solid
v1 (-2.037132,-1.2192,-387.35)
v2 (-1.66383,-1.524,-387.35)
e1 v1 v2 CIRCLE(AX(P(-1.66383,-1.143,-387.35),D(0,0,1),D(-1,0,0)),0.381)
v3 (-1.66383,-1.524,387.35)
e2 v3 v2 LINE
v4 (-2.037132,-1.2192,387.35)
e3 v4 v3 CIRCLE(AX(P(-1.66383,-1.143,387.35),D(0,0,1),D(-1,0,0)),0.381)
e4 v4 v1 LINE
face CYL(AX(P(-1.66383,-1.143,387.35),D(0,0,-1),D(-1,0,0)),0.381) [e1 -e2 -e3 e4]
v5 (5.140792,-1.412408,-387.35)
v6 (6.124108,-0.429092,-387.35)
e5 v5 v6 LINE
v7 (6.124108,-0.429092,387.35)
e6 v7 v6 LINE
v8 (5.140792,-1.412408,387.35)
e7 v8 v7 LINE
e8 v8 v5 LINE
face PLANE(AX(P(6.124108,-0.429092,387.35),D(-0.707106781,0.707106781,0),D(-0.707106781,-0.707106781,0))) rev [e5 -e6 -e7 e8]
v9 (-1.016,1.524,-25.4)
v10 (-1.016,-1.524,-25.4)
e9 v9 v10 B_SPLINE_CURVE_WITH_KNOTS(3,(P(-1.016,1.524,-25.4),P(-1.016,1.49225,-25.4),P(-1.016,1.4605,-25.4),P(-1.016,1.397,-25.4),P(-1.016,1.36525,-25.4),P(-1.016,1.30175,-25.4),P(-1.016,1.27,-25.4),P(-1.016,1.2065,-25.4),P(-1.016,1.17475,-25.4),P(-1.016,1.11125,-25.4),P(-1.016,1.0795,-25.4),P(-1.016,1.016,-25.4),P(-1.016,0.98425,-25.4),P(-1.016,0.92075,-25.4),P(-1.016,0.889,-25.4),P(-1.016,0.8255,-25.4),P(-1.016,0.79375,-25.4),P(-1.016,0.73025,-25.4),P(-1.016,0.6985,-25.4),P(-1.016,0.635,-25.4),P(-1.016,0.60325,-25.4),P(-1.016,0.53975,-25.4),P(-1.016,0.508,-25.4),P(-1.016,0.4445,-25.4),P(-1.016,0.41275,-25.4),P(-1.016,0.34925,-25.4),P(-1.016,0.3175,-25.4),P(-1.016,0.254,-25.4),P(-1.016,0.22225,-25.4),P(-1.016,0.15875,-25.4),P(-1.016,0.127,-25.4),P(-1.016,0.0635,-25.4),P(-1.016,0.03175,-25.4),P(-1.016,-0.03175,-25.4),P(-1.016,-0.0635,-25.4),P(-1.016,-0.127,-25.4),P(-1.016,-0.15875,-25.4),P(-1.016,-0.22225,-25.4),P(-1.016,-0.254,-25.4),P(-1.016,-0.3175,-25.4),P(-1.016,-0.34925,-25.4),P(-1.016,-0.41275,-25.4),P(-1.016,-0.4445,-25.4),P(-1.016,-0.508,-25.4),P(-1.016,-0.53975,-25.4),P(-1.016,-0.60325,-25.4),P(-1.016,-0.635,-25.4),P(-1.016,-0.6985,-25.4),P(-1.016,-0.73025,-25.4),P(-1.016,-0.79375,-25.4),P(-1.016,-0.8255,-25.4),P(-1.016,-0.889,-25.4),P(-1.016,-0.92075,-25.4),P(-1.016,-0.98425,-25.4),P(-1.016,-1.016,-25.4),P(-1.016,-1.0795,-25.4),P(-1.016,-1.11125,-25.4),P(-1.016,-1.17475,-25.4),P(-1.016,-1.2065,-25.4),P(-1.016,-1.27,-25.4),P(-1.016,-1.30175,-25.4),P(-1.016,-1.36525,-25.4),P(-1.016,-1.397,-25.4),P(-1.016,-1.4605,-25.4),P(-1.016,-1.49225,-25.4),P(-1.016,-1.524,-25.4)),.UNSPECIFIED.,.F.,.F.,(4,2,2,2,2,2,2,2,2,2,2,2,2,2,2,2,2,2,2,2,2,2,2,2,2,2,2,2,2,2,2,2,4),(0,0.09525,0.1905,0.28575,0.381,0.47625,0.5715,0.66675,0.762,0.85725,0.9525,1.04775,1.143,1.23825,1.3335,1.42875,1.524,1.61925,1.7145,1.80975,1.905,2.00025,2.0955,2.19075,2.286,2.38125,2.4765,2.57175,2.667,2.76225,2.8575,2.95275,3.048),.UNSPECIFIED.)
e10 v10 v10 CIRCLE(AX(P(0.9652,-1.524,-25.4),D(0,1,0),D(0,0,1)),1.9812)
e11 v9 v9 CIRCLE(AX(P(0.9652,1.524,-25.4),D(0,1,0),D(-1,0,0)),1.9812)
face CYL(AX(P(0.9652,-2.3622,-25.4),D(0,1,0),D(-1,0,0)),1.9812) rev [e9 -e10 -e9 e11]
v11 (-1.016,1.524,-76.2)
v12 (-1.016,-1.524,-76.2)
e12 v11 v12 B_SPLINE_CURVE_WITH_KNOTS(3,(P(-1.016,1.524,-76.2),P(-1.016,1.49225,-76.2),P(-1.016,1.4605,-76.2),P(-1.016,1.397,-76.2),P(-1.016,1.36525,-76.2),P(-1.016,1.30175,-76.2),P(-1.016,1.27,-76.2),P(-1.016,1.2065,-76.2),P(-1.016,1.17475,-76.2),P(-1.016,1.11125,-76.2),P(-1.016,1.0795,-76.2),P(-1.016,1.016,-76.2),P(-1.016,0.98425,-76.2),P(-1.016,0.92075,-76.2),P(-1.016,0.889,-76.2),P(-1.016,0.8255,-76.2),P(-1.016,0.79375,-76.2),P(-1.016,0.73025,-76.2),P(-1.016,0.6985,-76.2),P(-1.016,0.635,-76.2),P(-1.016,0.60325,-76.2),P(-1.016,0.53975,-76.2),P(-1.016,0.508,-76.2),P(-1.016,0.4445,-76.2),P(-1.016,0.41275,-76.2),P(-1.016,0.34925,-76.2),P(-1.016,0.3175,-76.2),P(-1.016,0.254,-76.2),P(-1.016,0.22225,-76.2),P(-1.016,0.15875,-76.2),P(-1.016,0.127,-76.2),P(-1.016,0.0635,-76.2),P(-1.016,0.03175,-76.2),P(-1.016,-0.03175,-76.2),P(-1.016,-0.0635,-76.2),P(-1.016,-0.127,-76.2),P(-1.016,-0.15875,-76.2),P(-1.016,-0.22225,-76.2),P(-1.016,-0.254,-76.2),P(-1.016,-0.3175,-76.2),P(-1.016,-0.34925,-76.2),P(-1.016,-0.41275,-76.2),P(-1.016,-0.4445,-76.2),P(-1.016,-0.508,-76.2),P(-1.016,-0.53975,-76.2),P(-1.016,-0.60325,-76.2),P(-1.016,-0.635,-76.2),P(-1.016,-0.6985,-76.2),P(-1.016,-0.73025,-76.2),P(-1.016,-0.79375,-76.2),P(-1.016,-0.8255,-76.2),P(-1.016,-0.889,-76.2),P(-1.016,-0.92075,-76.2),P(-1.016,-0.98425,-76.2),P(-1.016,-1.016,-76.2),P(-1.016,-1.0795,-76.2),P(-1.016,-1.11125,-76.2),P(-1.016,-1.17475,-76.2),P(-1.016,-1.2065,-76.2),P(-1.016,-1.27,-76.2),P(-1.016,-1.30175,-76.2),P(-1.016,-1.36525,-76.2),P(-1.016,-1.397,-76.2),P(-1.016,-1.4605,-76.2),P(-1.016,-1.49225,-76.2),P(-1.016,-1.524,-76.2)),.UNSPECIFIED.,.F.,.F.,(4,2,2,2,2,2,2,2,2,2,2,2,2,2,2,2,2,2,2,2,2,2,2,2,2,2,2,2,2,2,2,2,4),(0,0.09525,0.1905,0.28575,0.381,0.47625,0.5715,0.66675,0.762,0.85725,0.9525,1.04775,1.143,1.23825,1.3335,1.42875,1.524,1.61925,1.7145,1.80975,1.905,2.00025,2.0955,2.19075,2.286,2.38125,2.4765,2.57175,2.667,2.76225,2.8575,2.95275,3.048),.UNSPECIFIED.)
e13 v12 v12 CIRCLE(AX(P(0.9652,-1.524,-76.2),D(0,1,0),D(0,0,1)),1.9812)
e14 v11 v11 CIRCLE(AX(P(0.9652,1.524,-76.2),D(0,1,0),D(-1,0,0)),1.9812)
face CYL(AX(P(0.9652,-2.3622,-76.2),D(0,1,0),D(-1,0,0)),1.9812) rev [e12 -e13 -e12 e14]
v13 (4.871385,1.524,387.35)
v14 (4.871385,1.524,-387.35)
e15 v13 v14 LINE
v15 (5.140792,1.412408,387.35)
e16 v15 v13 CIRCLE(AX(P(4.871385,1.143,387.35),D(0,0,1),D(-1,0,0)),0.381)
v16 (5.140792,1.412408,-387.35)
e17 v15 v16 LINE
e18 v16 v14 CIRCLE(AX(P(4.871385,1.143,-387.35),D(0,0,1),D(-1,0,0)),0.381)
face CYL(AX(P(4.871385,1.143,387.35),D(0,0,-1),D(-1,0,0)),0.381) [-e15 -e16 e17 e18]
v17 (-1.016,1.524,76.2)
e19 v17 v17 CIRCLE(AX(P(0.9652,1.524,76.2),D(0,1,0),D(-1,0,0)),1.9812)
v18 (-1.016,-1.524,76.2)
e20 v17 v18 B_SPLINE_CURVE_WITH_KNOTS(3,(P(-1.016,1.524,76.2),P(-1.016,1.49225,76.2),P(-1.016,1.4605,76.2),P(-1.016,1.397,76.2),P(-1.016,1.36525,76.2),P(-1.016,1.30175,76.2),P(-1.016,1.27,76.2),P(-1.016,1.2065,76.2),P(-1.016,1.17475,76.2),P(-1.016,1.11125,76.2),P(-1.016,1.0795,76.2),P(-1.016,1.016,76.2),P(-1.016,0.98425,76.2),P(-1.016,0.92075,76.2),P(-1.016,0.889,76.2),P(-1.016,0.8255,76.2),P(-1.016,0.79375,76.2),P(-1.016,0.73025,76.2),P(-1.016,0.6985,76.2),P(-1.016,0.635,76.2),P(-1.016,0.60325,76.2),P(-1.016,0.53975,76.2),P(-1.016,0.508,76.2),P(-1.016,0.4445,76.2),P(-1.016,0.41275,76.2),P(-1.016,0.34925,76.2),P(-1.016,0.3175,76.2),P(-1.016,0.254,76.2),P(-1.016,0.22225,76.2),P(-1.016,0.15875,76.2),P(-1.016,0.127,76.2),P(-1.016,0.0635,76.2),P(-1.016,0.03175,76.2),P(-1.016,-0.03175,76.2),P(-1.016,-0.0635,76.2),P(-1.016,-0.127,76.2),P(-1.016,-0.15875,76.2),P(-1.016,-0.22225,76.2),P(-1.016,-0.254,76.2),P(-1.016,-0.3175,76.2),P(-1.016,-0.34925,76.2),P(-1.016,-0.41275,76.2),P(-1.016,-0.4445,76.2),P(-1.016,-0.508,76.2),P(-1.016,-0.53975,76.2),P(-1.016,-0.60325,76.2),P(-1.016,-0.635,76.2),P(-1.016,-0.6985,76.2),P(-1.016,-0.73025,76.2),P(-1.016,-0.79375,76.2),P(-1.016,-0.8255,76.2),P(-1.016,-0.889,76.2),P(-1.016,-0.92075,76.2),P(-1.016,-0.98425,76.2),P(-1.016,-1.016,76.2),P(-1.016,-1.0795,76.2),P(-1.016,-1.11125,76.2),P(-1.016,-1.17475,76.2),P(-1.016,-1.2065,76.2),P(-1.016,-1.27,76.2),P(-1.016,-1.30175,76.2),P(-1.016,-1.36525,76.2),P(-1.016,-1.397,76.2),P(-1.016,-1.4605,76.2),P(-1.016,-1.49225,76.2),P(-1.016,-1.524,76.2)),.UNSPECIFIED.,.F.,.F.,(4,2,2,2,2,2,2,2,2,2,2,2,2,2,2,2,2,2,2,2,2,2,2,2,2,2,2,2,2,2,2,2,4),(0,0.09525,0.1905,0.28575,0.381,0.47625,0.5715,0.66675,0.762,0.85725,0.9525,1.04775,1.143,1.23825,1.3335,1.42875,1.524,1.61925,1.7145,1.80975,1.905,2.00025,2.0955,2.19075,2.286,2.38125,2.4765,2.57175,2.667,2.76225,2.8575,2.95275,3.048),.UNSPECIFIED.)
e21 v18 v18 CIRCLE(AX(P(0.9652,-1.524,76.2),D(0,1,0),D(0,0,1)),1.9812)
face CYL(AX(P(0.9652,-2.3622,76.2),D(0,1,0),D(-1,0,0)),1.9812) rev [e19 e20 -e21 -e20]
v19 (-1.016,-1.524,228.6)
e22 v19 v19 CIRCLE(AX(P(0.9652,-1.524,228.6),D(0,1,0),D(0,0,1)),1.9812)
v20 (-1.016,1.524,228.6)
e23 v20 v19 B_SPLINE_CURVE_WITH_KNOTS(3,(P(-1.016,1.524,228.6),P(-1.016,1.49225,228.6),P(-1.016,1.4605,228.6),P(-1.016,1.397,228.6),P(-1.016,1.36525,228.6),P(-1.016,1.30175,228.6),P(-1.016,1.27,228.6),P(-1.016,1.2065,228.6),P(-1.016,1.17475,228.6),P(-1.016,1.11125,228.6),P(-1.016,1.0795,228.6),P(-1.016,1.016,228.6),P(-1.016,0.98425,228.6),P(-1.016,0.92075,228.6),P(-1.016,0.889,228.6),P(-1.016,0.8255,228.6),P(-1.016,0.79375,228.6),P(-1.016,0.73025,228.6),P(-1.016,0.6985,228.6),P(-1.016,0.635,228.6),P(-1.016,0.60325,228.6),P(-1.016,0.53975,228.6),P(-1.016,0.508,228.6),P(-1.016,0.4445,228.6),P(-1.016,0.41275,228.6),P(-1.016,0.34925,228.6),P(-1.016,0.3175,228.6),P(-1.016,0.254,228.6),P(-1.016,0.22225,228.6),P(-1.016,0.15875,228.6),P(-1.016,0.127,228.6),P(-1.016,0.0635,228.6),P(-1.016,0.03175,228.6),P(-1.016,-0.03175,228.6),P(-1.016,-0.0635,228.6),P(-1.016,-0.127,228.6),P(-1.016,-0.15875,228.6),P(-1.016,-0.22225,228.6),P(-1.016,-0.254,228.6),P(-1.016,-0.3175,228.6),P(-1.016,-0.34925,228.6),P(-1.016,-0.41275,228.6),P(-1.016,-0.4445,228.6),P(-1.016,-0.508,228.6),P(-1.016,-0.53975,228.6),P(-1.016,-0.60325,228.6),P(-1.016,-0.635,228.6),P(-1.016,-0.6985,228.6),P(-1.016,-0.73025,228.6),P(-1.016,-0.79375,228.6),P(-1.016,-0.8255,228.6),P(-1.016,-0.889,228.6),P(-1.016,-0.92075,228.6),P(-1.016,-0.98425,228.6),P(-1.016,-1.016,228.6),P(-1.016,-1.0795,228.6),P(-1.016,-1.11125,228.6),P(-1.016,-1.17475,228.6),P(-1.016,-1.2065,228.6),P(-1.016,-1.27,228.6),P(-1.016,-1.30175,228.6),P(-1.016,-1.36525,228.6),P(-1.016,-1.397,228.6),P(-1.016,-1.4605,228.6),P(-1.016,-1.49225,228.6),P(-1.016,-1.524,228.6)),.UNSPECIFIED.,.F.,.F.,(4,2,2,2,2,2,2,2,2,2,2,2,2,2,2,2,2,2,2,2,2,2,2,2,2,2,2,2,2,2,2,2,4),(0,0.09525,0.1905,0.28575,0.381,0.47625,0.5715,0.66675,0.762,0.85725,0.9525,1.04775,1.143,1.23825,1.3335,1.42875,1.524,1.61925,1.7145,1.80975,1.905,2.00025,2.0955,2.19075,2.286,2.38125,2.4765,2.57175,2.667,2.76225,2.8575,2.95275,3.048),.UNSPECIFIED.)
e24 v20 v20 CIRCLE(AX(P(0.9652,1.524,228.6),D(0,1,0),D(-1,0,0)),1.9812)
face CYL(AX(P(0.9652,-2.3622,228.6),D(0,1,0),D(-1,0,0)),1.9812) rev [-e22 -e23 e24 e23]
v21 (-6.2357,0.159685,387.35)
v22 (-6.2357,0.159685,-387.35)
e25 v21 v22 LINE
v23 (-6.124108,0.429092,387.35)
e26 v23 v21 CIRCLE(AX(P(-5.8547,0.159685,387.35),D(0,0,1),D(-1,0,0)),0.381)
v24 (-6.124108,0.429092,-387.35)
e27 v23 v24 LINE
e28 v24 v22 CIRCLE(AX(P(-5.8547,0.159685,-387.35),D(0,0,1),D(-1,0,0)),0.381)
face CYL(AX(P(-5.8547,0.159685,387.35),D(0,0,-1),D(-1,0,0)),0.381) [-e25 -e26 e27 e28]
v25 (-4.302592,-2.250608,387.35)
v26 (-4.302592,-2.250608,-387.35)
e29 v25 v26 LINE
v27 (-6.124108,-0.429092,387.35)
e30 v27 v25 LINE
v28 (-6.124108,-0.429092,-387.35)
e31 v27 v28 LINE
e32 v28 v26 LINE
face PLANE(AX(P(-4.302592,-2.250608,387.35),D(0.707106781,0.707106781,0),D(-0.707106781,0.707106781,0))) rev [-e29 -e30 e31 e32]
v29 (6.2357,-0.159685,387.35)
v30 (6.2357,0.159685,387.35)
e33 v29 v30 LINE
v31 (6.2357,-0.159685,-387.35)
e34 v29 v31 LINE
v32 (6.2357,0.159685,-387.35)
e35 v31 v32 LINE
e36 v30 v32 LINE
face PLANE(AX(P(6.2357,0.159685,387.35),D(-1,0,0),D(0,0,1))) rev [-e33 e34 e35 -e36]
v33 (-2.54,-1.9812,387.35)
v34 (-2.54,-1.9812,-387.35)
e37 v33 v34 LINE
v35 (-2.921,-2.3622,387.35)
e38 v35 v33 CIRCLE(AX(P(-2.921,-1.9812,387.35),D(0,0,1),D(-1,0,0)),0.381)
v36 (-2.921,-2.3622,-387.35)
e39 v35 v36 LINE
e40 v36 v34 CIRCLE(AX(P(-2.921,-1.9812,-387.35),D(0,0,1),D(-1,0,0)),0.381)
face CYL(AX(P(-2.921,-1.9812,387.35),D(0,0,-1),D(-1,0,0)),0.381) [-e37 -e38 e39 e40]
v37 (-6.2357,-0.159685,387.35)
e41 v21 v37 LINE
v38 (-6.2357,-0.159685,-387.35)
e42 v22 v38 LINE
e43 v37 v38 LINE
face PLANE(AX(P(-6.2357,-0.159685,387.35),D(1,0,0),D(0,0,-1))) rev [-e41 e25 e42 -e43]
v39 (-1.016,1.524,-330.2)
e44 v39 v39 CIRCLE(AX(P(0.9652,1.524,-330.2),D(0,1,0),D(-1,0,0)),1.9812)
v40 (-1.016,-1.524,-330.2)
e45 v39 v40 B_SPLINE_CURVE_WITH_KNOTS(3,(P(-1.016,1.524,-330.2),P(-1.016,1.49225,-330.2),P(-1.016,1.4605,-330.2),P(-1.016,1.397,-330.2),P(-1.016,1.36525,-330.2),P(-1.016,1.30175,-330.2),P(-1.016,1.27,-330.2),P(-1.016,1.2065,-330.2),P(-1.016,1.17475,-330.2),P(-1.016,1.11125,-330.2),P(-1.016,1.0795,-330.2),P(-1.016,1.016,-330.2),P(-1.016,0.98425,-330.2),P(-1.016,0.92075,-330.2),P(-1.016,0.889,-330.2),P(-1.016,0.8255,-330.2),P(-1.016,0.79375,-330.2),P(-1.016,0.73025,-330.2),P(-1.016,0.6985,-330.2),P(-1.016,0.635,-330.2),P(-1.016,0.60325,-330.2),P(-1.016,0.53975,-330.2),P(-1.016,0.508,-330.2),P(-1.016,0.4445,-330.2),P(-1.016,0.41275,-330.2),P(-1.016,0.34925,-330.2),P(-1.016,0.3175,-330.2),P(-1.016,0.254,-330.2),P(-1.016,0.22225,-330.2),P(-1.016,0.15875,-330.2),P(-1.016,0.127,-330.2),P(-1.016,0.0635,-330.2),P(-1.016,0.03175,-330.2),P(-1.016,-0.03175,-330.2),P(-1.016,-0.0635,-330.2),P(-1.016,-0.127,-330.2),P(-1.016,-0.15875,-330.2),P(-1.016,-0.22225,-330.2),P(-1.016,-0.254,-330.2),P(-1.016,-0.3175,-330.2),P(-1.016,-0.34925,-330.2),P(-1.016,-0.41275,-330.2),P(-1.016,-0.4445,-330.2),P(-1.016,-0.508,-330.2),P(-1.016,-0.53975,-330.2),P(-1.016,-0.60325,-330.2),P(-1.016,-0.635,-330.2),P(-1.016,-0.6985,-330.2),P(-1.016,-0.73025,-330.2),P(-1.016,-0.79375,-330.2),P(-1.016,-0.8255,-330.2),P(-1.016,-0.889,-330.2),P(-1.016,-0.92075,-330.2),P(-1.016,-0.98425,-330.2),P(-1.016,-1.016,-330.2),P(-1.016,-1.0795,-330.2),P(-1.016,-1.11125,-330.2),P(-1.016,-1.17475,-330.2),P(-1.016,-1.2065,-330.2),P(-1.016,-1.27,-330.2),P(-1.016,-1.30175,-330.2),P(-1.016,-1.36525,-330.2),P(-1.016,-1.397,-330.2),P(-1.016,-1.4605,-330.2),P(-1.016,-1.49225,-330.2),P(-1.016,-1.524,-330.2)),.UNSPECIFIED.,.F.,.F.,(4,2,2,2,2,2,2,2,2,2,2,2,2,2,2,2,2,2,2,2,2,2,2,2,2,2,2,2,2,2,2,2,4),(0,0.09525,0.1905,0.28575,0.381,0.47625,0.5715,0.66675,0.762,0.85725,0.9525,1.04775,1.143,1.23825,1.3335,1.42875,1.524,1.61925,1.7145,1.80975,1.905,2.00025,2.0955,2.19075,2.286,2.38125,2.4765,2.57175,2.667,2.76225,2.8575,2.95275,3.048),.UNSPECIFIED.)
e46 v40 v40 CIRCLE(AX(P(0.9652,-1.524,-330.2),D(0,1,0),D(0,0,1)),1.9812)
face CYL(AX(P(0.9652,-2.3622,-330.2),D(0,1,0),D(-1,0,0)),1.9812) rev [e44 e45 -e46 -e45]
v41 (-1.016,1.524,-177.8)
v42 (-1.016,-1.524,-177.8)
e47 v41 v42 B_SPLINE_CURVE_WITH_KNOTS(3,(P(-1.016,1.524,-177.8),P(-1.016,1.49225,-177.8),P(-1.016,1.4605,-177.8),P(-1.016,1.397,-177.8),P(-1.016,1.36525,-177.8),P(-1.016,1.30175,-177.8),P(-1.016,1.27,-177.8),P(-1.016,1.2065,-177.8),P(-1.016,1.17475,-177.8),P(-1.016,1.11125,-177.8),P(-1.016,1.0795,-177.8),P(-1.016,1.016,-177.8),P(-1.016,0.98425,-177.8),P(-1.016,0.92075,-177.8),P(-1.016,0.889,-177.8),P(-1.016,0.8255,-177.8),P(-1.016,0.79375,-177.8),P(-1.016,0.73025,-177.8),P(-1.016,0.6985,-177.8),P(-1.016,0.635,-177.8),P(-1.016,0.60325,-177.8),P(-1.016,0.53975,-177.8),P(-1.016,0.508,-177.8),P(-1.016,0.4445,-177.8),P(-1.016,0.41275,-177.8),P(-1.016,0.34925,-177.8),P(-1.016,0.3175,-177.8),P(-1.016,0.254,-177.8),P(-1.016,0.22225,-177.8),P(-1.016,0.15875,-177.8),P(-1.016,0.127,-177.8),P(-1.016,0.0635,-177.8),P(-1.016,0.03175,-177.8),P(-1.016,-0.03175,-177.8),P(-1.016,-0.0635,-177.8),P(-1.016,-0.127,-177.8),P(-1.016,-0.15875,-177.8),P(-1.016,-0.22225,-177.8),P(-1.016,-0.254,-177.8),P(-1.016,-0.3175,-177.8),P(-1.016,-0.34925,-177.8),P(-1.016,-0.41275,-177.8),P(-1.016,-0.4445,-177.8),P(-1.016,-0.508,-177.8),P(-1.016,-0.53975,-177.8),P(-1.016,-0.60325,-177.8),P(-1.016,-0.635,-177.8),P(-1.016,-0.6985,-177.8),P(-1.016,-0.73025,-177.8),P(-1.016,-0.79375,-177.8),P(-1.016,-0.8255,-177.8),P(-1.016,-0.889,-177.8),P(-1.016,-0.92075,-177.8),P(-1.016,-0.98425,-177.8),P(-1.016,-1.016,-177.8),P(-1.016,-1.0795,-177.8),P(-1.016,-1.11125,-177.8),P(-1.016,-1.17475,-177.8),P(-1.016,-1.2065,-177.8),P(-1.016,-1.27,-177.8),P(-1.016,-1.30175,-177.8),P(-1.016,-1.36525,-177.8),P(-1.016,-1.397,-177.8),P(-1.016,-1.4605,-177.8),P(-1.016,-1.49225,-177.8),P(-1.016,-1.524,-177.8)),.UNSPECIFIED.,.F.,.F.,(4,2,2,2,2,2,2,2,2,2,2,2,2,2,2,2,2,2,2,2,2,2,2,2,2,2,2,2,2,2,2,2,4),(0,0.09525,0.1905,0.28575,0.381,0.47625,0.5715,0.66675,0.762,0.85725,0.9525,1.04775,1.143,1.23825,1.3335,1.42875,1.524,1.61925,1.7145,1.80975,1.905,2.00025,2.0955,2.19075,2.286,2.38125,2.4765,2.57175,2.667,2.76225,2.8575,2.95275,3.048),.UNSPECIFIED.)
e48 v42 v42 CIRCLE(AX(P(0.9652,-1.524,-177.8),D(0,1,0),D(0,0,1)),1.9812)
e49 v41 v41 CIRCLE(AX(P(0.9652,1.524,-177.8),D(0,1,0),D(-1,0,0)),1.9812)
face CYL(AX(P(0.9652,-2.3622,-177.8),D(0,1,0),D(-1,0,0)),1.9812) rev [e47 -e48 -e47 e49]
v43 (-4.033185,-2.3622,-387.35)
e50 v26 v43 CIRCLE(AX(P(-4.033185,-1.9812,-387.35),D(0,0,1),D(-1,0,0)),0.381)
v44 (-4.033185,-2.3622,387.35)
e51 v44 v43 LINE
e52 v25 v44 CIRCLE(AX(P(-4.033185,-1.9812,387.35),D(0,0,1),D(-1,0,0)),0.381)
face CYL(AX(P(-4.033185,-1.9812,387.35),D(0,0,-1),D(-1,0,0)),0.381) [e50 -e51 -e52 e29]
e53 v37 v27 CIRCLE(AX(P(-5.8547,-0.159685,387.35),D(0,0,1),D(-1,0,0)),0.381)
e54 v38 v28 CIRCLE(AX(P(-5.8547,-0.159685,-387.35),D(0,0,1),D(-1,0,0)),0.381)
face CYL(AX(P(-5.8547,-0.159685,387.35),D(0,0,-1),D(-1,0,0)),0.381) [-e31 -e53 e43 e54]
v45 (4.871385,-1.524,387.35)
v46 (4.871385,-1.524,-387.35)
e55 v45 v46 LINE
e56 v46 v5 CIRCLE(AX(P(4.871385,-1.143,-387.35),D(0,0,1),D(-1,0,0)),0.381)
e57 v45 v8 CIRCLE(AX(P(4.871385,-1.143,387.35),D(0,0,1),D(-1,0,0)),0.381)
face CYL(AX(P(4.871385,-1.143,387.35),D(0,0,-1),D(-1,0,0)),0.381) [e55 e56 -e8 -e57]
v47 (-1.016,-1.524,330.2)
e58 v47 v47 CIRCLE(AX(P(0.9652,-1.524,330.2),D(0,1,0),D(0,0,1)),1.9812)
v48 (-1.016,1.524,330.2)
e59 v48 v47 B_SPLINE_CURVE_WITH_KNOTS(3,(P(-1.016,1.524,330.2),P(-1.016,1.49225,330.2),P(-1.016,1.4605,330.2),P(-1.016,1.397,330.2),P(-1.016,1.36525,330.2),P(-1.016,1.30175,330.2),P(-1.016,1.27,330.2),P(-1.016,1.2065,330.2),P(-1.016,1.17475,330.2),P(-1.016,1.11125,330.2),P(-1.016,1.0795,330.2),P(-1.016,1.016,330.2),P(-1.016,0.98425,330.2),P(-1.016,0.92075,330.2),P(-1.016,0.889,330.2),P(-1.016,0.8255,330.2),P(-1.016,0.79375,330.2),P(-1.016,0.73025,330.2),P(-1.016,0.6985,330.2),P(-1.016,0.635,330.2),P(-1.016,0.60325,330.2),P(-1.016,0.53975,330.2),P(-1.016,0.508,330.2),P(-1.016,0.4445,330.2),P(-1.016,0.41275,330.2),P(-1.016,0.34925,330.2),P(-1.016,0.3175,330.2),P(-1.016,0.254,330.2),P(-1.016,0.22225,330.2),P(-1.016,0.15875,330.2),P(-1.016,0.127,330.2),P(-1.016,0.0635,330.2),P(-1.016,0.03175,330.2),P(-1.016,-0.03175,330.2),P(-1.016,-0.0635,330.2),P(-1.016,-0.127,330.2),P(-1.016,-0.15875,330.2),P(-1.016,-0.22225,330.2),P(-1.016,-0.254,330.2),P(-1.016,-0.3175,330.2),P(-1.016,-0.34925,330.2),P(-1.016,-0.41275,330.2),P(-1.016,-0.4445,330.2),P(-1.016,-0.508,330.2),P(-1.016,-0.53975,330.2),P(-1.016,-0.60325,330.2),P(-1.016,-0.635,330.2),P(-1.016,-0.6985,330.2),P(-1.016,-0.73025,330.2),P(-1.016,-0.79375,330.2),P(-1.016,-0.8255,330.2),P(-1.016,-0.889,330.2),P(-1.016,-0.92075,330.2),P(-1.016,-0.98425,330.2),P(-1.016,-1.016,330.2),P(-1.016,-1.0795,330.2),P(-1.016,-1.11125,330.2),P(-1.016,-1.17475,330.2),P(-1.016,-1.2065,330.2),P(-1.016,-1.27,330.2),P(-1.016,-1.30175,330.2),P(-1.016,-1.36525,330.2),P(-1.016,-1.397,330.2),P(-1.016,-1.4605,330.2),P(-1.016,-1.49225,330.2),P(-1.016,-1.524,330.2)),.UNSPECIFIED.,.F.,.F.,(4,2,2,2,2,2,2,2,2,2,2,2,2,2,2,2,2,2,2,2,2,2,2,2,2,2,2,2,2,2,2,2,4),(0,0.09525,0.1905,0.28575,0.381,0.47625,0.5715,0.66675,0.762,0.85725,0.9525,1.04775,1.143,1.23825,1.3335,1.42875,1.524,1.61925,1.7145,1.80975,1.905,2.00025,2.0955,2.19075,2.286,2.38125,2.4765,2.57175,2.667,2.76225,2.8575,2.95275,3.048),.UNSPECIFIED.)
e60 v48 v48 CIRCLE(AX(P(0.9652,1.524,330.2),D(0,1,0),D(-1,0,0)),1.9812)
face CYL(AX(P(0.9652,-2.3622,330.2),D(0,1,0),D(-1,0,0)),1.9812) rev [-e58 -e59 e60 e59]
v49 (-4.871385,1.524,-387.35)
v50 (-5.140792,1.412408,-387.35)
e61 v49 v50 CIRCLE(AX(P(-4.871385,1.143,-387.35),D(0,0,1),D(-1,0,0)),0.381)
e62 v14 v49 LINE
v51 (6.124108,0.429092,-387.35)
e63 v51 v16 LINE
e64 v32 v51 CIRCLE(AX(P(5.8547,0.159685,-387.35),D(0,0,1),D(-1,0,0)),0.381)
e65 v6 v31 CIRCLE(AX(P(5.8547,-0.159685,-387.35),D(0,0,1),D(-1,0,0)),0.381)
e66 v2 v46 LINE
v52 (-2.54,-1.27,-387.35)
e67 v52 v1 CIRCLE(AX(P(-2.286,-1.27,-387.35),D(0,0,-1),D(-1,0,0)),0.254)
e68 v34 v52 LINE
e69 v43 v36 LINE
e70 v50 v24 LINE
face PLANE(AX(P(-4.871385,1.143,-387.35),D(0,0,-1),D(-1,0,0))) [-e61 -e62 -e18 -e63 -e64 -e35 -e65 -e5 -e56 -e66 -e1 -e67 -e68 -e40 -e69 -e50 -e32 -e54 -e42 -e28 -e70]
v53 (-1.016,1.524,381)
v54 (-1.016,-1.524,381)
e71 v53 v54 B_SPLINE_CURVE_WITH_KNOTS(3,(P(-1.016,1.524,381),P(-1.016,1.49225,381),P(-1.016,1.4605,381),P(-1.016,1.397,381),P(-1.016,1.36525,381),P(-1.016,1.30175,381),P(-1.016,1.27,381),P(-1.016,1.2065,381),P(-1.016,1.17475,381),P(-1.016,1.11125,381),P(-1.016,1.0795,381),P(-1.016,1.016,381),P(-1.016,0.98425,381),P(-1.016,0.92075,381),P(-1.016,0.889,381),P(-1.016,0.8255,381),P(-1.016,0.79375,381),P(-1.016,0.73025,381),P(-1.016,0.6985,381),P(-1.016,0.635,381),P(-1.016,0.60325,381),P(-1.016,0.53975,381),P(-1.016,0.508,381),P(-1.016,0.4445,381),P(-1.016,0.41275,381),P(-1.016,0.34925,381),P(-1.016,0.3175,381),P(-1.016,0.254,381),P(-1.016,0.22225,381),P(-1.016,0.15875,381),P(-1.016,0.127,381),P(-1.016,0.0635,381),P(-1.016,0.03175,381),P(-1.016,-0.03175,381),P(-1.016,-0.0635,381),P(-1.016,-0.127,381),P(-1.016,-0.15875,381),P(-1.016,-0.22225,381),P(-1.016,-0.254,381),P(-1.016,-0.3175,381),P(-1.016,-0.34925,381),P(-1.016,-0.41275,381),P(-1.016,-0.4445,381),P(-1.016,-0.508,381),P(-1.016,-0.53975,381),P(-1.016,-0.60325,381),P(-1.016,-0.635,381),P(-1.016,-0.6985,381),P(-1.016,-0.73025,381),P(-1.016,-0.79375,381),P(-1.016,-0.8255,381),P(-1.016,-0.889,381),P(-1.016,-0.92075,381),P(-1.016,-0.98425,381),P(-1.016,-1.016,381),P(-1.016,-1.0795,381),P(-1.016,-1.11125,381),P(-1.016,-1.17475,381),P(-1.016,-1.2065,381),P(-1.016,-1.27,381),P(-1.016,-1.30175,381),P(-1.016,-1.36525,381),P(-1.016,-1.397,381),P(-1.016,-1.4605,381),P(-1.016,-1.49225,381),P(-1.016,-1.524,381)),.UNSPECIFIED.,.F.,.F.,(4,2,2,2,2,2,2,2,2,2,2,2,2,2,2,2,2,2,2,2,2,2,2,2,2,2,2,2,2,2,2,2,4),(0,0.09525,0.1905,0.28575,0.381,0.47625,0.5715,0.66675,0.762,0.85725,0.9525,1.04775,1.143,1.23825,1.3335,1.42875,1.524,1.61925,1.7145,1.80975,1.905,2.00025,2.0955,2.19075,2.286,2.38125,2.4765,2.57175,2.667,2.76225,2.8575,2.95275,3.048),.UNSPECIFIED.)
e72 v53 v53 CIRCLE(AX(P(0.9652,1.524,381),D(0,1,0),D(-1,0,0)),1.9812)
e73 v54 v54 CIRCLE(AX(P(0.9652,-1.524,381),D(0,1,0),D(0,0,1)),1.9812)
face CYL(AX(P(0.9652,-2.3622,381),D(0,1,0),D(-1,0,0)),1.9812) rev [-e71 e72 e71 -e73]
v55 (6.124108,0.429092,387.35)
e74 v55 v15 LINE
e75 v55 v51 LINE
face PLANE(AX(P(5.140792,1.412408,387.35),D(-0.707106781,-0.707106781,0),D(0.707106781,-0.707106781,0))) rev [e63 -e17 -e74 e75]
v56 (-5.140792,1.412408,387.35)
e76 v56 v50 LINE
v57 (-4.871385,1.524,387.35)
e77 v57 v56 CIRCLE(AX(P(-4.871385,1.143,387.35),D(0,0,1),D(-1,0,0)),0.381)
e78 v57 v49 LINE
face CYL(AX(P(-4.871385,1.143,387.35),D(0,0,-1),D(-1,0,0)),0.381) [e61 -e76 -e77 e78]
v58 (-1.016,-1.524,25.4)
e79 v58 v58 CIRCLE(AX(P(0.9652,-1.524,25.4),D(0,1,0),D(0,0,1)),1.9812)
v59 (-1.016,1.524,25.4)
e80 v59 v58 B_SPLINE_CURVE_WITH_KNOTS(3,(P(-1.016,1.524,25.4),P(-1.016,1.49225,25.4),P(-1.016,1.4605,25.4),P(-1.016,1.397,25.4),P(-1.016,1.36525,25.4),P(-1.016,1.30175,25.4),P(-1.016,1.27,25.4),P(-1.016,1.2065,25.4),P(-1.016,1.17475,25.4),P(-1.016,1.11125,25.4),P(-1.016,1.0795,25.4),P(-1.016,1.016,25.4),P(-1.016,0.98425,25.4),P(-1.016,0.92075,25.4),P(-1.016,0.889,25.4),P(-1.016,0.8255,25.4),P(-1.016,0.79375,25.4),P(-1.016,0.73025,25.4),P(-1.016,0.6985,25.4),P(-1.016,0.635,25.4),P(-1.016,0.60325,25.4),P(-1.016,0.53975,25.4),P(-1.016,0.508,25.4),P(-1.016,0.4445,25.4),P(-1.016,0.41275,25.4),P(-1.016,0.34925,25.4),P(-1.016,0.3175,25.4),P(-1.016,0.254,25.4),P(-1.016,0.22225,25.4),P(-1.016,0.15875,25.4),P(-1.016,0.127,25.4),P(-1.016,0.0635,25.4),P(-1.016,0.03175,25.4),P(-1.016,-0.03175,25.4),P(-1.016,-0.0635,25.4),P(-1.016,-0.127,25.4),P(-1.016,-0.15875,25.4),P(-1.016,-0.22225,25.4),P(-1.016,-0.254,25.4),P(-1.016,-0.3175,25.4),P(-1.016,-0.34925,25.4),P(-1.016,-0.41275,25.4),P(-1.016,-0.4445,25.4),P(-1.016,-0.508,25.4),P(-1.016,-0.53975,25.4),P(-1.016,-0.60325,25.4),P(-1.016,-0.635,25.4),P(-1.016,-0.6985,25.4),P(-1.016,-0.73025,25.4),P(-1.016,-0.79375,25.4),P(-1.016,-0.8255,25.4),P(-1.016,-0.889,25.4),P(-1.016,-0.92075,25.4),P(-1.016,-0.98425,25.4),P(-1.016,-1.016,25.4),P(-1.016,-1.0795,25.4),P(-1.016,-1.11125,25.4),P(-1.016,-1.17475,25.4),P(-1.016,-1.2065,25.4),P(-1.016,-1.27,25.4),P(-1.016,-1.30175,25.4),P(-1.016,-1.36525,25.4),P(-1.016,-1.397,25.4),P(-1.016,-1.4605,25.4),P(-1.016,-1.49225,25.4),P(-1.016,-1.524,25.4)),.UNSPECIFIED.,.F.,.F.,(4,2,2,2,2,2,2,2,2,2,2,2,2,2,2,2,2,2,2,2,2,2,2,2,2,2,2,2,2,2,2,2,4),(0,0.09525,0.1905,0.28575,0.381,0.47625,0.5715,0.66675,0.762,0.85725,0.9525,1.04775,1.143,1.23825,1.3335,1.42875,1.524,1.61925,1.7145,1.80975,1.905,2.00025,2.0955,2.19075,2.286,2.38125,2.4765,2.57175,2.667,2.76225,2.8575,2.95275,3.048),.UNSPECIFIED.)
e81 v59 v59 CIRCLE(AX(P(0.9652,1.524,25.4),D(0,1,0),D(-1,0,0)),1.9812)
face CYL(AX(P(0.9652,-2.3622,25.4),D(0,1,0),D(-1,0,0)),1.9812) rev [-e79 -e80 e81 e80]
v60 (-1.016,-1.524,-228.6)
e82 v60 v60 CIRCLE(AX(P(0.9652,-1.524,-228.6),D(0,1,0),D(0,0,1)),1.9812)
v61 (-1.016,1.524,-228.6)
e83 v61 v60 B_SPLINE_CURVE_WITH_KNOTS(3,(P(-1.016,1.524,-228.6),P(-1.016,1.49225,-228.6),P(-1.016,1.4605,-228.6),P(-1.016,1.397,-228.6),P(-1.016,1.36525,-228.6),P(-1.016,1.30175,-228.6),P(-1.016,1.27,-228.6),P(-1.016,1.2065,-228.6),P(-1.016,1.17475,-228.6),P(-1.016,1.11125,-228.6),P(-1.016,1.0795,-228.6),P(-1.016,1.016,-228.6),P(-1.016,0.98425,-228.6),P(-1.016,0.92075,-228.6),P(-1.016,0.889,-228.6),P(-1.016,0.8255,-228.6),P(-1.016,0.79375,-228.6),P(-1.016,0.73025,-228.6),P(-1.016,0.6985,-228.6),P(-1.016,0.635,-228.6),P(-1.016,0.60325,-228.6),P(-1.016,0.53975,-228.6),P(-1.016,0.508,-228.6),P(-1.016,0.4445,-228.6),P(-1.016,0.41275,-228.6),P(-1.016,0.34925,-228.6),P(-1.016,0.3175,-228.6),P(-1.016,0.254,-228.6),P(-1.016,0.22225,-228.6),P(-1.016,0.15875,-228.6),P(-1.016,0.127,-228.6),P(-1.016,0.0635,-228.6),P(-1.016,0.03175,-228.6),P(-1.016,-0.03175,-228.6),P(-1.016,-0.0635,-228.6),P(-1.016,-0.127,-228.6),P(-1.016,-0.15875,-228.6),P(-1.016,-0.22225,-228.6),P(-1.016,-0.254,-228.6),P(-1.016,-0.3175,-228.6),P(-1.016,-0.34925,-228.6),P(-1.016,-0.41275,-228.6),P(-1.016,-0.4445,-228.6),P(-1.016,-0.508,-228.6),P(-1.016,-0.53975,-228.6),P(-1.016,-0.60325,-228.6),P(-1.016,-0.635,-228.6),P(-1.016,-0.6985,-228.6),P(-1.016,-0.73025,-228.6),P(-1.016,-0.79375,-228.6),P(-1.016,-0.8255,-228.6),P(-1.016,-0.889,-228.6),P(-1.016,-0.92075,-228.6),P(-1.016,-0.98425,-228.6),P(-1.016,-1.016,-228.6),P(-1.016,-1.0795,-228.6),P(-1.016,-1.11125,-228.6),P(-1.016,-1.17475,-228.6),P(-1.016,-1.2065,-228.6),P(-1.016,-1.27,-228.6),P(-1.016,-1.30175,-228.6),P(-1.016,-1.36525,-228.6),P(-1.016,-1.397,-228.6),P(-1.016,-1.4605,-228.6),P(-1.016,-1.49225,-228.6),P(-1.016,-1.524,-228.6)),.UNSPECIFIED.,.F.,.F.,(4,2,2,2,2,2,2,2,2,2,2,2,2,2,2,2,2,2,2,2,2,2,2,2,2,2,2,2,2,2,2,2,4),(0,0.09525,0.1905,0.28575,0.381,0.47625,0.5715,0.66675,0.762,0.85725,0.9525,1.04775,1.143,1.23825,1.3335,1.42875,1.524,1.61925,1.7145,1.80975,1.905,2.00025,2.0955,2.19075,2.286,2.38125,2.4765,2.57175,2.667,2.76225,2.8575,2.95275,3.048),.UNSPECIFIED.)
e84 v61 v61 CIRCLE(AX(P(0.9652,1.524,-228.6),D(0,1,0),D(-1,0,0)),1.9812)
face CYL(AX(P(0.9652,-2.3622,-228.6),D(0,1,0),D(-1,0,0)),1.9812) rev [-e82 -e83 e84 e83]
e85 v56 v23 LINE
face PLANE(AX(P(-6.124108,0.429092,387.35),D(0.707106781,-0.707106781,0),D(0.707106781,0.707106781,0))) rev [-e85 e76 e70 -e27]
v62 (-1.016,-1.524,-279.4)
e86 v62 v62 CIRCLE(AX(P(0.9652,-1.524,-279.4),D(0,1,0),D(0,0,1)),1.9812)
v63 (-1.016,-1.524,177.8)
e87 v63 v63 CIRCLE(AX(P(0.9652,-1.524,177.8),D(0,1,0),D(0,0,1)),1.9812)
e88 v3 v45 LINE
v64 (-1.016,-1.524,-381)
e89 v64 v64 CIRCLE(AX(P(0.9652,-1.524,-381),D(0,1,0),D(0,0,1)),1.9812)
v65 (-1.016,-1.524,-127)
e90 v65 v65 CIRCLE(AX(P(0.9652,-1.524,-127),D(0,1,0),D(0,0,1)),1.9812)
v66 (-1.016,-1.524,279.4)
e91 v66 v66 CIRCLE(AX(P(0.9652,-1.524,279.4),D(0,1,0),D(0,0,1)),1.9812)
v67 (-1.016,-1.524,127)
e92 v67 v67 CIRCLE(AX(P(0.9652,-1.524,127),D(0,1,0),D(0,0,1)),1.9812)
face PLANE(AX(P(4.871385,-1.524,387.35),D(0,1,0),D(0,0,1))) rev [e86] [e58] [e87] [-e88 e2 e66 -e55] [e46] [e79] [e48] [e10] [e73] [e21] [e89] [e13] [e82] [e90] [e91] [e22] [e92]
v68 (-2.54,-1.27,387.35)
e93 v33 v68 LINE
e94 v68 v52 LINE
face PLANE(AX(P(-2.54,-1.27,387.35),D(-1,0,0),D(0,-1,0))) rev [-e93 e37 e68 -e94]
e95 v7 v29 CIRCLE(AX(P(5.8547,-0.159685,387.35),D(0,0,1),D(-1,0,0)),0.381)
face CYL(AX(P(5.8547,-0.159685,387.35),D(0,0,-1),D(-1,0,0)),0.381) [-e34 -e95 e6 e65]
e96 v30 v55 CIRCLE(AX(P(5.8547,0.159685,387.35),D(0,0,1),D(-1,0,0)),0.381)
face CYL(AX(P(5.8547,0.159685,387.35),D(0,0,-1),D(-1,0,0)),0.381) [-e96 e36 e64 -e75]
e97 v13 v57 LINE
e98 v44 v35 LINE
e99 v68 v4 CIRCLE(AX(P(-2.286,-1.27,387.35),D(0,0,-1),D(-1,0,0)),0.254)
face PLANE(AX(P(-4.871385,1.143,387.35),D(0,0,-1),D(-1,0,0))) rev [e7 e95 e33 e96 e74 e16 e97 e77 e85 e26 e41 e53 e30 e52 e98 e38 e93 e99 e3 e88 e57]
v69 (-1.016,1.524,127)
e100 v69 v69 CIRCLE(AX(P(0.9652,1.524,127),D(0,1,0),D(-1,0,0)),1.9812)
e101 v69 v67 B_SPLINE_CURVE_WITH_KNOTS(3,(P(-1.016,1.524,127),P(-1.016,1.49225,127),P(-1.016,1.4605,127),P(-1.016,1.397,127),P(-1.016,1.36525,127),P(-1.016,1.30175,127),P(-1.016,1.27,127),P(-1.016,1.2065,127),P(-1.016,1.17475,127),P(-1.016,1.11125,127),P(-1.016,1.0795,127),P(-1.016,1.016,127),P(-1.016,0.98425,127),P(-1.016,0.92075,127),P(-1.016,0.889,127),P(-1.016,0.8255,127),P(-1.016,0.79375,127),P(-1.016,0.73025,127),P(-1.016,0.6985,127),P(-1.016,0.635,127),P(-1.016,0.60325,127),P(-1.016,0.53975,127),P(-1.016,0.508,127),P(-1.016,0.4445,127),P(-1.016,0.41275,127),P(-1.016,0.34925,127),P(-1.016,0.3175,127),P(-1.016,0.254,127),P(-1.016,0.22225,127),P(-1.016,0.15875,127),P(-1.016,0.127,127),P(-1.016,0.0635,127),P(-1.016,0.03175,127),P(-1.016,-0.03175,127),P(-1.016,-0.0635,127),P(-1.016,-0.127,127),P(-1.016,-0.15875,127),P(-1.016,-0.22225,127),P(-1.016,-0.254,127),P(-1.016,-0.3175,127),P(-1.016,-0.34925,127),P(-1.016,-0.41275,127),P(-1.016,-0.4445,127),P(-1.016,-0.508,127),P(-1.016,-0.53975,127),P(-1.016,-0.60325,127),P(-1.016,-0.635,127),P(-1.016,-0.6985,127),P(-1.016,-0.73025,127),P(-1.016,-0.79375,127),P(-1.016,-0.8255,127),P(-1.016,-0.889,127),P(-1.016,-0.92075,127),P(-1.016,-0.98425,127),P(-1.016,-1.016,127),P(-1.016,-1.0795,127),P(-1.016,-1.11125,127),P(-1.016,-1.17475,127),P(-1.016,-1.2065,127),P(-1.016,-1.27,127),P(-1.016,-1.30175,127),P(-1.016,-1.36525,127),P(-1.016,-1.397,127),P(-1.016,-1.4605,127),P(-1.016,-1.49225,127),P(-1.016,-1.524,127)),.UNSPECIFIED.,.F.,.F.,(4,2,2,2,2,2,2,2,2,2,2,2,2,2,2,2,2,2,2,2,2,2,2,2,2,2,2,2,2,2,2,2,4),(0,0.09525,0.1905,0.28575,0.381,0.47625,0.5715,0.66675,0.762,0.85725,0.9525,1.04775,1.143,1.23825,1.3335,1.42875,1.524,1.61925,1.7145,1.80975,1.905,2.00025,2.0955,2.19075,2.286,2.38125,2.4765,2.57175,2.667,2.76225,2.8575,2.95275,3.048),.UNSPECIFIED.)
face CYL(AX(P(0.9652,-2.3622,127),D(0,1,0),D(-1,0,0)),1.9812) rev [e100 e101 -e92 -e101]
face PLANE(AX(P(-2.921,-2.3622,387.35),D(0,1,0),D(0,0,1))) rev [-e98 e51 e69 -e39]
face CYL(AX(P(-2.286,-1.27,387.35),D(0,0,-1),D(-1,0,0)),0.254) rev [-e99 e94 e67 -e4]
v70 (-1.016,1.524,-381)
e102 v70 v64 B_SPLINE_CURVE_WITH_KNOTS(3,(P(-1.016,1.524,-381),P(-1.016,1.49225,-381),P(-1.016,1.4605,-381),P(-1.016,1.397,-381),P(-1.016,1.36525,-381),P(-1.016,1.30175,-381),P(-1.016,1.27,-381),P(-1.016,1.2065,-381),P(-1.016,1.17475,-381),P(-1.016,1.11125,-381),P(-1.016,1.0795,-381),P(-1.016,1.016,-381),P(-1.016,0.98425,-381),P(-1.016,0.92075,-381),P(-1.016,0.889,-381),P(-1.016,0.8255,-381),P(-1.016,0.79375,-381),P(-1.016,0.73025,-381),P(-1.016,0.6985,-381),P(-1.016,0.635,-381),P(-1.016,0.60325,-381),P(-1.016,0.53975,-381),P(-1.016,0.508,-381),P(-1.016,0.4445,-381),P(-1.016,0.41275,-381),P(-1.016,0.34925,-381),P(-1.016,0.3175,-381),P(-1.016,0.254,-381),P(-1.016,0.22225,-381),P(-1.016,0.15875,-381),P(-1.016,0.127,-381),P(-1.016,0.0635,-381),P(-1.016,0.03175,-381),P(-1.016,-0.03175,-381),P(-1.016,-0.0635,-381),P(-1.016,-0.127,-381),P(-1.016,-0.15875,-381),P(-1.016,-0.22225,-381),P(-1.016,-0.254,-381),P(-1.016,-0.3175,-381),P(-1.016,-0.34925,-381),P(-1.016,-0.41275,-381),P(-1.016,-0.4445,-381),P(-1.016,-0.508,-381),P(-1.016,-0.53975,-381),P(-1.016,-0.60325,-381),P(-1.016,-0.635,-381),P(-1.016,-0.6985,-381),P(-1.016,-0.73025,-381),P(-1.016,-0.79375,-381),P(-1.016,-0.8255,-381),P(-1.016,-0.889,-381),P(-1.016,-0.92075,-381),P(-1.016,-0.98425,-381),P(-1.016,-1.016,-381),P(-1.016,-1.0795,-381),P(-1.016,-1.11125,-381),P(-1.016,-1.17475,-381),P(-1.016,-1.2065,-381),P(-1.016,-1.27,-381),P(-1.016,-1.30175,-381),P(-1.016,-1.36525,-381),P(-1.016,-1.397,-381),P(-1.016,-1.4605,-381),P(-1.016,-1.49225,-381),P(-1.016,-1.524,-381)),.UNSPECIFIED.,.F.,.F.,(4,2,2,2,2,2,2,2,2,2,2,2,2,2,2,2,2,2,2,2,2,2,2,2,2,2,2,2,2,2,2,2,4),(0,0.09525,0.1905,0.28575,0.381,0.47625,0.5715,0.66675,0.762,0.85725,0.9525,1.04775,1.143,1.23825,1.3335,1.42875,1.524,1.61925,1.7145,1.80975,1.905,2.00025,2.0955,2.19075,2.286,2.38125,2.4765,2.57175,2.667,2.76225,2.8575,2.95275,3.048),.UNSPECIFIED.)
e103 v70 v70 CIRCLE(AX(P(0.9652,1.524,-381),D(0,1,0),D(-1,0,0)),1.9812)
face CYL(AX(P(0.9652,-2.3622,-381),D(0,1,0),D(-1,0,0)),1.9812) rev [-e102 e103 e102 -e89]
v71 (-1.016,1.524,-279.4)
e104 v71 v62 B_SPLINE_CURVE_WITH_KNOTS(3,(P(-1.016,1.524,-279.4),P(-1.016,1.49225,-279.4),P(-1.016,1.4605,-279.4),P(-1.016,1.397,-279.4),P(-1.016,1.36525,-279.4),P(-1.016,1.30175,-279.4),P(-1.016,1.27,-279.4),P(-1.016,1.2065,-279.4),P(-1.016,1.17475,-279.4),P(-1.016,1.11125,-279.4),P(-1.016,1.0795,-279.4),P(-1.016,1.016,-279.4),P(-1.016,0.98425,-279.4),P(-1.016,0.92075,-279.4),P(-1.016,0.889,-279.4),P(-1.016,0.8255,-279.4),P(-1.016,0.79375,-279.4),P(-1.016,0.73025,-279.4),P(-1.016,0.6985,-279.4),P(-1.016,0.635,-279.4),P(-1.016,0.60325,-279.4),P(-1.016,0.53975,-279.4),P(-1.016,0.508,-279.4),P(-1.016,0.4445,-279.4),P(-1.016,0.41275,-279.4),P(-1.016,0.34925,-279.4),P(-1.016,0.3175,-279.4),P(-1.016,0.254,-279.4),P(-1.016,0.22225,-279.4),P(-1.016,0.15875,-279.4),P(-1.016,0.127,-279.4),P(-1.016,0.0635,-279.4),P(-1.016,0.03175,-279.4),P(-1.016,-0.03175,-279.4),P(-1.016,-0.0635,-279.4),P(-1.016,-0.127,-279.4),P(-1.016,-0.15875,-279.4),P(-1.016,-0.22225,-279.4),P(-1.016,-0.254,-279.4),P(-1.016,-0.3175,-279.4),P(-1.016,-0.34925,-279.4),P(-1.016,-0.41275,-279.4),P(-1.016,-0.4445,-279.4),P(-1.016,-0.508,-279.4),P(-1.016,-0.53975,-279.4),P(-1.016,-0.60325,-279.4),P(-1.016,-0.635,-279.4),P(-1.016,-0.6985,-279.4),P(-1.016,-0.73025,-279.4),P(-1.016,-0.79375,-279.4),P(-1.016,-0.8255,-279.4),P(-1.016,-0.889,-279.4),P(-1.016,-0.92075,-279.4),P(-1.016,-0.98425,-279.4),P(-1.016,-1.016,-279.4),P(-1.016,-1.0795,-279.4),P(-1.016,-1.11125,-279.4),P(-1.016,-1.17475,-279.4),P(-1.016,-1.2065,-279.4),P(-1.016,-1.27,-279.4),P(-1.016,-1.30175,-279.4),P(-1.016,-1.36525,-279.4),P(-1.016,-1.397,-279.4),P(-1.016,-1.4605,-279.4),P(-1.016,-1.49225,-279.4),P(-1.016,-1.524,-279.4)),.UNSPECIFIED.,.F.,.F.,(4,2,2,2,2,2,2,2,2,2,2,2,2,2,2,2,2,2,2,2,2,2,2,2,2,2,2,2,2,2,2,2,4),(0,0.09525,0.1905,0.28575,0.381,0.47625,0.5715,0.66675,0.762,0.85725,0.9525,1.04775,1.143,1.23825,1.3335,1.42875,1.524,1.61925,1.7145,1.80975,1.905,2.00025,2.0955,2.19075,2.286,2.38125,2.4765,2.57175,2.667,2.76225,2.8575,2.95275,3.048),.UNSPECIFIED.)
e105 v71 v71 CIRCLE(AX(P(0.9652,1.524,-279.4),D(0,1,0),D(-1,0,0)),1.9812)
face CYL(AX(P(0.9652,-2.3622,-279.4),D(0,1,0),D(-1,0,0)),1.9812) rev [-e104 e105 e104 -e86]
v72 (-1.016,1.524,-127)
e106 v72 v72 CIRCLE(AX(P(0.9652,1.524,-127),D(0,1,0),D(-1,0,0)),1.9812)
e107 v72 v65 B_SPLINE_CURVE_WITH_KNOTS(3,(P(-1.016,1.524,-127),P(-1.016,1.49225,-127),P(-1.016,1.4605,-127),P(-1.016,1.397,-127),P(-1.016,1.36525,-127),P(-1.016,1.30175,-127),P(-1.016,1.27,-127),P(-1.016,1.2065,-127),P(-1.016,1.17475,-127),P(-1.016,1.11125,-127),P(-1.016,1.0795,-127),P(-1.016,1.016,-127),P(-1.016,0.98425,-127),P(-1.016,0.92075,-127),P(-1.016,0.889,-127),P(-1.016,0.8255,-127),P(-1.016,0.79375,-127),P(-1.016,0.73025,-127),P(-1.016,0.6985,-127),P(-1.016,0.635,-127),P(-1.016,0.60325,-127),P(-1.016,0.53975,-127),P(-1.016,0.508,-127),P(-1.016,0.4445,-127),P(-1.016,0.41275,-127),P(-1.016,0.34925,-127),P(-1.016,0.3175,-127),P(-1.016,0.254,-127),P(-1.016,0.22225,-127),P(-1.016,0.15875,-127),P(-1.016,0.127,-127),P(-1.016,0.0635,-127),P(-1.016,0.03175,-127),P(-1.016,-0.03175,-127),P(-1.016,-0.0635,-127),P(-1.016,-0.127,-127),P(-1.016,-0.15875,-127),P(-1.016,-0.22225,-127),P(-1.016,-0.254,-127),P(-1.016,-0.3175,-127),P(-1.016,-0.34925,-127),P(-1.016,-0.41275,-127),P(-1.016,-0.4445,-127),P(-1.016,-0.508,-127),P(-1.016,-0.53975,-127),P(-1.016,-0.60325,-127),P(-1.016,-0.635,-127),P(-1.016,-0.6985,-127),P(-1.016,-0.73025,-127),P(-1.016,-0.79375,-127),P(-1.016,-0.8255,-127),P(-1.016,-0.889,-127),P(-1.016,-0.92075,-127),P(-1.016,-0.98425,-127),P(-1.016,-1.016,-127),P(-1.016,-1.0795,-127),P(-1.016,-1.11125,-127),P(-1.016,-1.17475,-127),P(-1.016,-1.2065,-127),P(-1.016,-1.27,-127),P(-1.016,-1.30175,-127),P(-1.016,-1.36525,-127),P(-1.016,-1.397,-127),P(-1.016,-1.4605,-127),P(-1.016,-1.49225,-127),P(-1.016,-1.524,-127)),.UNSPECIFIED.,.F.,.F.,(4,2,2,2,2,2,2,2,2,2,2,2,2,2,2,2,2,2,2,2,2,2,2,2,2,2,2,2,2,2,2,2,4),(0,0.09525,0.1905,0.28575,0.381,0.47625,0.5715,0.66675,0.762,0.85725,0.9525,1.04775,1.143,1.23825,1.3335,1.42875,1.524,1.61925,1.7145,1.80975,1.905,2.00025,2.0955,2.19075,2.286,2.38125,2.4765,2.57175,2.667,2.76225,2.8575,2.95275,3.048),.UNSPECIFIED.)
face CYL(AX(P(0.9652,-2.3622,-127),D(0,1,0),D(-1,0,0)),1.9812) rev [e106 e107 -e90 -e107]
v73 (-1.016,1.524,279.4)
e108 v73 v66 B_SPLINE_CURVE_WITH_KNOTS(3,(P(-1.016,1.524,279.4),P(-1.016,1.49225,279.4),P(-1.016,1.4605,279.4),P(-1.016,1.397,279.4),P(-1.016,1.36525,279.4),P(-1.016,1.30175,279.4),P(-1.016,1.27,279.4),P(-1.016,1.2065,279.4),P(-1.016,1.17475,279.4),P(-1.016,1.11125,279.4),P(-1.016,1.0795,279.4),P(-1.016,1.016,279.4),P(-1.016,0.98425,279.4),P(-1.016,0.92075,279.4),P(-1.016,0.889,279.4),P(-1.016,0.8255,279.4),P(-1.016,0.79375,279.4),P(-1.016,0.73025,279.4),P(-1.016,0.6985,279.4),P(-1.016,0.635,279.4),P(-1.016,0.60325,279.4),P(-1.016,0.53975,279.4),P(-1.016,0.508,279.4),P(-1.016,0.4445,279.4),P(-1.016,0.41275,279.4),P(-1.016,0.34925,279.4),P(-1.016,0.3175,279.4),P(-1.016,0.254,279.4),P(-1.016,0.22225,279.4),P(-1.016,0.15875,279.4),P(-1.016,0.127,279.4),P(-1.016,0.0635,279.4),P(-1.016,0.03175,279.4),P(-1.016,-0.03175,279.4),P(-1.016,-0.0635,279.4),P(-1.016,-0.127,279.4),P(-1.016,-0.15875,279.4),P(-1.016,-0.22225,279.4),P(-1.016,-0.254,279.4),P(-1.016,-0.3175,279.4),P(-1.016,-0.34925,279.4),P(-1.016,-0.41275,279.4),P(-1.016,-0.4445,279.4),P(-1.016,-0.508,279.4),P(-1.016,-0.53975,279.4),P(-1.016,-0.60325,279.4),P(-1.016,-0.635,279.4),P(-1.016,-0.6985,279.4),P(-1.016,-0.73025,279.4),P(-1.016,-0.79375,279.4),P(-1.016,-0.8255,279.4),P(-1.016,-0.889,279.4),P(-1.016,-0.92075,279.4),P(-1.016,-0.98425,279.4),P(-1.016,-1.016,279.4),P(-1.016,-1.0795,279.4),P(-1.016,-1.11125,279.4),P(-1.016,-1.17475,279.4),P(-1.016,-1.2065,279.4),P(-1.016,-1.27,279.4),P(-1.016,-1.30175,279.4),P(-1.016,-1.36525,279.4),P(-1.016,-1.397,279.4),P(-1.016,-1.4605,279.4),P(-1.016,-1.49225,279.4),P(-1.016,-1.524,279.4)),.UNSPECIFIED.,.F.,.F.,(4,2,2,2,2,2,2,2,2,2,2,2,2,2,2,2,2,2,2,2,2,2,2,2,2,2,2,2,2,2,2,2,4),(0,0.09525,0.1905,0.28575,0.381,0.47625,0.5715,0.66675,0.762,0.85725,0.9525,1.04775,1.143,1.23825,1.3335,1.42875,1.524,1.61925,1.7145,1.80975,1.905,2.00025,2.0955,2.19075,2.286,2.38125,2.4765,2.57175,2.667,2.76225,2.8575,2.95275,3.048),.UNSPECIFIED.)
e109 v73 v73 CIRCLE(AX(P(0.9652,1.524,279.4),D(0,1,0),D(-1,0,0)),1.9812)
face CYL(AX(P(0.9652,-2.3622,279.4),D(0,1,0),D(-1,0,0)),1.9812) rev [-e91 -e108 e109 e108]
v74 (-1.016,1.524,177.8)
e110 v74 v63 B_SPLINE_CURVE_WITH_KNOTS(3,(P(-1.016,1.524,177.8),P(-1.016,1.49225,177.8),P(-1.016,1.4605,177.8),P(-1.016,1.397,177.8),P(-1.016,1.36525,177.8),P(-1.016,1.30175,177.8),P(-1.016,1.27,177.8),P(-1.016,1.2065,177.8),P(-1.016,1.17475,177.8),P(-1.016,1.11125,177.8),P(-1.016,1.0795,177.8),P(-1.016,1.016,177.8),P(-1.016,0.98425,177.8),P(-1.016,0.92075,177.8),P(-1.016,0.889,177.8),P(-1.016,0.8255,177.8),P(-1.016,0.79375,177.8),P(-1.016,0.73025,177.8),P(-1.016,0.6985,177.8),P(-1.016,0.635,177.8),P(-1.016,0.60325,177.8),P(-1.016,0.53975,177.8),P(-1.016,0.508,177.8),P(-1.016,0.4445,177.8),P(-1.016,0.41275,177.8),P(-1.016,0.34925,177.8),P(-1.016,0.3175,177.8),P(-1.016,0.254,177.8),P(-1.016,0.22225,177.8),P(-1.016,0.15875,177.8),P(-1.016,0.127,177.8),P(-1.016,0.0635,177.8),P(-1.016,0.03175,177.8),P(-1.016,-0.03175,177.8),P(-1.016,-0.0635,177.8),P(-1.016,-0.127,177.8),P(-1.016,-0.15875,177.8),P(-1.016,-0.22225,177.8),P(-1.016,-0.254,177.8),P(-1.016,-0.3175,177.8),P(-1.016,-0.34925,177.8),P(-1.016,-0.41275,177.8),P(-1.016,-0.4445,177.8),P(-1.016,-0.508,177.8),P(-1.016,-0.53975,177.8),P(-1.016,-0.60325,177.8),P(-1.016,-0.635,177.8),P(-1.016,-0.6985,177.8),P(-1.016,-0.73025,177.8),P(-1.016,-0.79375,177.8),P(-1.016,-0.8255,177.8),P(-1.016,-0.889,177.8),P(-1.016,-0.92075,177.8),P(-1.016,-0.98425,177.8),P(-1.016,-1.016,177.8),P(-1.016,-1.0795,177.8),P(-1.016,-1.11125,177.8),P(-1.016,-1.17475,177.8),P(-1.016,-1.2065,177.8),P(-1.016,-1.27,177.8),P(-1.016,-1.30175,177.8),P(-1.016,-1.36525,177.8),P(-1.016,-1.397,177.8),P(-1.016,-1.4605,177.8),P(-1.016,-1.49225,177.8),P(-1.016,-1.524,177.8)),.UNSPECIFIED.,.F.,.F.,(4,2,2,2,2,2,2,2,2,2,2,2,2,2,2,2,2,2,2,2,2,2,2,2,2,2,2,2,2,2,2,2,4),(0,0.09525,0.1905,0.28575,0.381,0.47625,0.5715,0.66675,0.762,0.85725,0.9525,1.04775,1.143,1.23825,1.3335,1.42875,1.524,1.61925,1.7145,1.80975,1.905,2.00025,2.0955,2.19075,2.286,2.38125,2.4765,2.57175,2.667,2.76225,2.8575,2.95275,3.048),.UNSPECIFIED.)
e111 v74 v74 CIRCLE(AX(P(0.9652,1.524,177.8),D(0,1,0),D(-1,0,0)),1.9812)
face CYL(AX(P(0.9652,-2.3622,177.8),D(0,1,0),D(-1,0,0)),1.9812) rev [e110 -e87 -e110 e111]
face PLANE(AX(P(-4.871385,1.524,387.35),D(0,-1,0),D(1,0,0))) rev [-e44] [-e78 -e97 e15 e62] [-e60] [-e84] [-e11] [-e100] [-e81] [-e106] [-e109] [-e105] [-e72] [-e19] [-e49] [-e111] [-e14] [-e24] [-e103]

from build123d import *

# Parameters (mm, degrees)
BOSS_EXTRUDE1_START = -387.35
BOSS_EXTRUDE1_DEPTH = 774.7
SKETCH2_R           = 1.9812
CUT_EXTRUDE1_DEPTH  = 388.419680715
LPATTERN1_COUNT     = 16
LPATTERN1_PITCH     = 50.8


# Read off the part's stored shape, not the designer's step: Boss-Extrude1
with BuildPart() as part:
    # Boss-Extrude1 outline → Boss-Extrude1 (new body)
    with BuildSketch(Plane.XY.offset(BOSS_EXTRUDE1_START)):
        with BuildLine():
            ThreePointArc((-4.871384633, 1.524), (-5.01718702, 1.494998102), (-5.140792316, 1.412407684))
            Line((-5.140792316, 1.412407684), (-6.124107684, 0.429092316))
            ThreePointArc((-6.124107684, 0.429092316), (-6.206698102, 0.30548702), (-6.2357, 0.159684633))
            Line((-6.2357, 0.159684633), (-6.2357, -0.159684633))
            ThreePointArc((-6.2357, -0.159684633), (-6.206698102, -0.30548702), (-6.124107684, -0.429092316))
            Line((-6.124107684, -0.429092316), (-4.302592316, -2.250607684))
            ThreePointArc((-4.302592316, -2.250607684), (-4.17898702, -2.333198102), (-4.033184633, -2.3622))
            Line((-4.033184633, -2.3622), (-2.921, -2.3622))
            ThreePointArc((-2.921, -2.3622), (-2.651592316, -2.250607684), (-2.54, -1.9812))
            Line((-2.54, -1.9812), (-2.54, -1.27))
            ThreePointArc((-2.54, -1.27), (-2.311529276, -1.017286217), (-2.037131842, -1.2192))
            ThreePointArc((-2.037131842, -1.2192), (-1.904795163, -1.438121331), (-1.663829605, -1.524))
            Line((-1.663829605, -1.524), (4.871384633, -1.524))
            ThreePointArc((4.871384633, -1.524), (5.01718702, -1.494998102), (5.140792316, -1.412407684))
            Line((5.140792316, -1.412407684), (6.124107684, -0.429092316))
            ThreePointArc((6.124107684, -0.429092316), (6.206698102, -0.30548702), (6.2357, -0.159684633))
            Line((6.2357, -0.159684633), (6.2357, 0.159684633))
            ThreePointArc((6.2357, 0.159684633), (6.206698102, 0.30548702), (6.124107684, 0.429092316))
            Line((6.124107684, 0.429092316), (5.140792316, 1.412407684))
            ThreePointArc((5.140792316, 1.412407684), (5.01718702, 1.494998102), (4.871384633, 1.524))
            Line((4.871384633, 1.524), (-4.871384633, 1.524))
        make_face()
    extrude(amount=BOSS_EXTRUDE1_DEPTH)

    # Sketch2 → Cut-Extrude1 (cut, through all)
    with BuildSketch(Plane(origin=(0, 1.524, 0), x_dir=(1, 0, 0), z_dir=(0, 1, 0))):
        with Locations(Location((0.9652, -381, 0), (0, 0, 180))):
            Circle(SKETCH2_R)
    cut_extrude1 = extrude(amount=-CUT_EXTRUDE1_DEPTH, mode=Mode.SUBTRACT)

    # LPattern1: Cut-Extrude1 ×16
    with Locations(*[(0, 0, -i * LPATTERN1_PITCH) for i in range(1, LPATTERN1_COUNT)]):
        add(cut_extrude1, mode=Mode.SUBTRACT)


solid = part.part
